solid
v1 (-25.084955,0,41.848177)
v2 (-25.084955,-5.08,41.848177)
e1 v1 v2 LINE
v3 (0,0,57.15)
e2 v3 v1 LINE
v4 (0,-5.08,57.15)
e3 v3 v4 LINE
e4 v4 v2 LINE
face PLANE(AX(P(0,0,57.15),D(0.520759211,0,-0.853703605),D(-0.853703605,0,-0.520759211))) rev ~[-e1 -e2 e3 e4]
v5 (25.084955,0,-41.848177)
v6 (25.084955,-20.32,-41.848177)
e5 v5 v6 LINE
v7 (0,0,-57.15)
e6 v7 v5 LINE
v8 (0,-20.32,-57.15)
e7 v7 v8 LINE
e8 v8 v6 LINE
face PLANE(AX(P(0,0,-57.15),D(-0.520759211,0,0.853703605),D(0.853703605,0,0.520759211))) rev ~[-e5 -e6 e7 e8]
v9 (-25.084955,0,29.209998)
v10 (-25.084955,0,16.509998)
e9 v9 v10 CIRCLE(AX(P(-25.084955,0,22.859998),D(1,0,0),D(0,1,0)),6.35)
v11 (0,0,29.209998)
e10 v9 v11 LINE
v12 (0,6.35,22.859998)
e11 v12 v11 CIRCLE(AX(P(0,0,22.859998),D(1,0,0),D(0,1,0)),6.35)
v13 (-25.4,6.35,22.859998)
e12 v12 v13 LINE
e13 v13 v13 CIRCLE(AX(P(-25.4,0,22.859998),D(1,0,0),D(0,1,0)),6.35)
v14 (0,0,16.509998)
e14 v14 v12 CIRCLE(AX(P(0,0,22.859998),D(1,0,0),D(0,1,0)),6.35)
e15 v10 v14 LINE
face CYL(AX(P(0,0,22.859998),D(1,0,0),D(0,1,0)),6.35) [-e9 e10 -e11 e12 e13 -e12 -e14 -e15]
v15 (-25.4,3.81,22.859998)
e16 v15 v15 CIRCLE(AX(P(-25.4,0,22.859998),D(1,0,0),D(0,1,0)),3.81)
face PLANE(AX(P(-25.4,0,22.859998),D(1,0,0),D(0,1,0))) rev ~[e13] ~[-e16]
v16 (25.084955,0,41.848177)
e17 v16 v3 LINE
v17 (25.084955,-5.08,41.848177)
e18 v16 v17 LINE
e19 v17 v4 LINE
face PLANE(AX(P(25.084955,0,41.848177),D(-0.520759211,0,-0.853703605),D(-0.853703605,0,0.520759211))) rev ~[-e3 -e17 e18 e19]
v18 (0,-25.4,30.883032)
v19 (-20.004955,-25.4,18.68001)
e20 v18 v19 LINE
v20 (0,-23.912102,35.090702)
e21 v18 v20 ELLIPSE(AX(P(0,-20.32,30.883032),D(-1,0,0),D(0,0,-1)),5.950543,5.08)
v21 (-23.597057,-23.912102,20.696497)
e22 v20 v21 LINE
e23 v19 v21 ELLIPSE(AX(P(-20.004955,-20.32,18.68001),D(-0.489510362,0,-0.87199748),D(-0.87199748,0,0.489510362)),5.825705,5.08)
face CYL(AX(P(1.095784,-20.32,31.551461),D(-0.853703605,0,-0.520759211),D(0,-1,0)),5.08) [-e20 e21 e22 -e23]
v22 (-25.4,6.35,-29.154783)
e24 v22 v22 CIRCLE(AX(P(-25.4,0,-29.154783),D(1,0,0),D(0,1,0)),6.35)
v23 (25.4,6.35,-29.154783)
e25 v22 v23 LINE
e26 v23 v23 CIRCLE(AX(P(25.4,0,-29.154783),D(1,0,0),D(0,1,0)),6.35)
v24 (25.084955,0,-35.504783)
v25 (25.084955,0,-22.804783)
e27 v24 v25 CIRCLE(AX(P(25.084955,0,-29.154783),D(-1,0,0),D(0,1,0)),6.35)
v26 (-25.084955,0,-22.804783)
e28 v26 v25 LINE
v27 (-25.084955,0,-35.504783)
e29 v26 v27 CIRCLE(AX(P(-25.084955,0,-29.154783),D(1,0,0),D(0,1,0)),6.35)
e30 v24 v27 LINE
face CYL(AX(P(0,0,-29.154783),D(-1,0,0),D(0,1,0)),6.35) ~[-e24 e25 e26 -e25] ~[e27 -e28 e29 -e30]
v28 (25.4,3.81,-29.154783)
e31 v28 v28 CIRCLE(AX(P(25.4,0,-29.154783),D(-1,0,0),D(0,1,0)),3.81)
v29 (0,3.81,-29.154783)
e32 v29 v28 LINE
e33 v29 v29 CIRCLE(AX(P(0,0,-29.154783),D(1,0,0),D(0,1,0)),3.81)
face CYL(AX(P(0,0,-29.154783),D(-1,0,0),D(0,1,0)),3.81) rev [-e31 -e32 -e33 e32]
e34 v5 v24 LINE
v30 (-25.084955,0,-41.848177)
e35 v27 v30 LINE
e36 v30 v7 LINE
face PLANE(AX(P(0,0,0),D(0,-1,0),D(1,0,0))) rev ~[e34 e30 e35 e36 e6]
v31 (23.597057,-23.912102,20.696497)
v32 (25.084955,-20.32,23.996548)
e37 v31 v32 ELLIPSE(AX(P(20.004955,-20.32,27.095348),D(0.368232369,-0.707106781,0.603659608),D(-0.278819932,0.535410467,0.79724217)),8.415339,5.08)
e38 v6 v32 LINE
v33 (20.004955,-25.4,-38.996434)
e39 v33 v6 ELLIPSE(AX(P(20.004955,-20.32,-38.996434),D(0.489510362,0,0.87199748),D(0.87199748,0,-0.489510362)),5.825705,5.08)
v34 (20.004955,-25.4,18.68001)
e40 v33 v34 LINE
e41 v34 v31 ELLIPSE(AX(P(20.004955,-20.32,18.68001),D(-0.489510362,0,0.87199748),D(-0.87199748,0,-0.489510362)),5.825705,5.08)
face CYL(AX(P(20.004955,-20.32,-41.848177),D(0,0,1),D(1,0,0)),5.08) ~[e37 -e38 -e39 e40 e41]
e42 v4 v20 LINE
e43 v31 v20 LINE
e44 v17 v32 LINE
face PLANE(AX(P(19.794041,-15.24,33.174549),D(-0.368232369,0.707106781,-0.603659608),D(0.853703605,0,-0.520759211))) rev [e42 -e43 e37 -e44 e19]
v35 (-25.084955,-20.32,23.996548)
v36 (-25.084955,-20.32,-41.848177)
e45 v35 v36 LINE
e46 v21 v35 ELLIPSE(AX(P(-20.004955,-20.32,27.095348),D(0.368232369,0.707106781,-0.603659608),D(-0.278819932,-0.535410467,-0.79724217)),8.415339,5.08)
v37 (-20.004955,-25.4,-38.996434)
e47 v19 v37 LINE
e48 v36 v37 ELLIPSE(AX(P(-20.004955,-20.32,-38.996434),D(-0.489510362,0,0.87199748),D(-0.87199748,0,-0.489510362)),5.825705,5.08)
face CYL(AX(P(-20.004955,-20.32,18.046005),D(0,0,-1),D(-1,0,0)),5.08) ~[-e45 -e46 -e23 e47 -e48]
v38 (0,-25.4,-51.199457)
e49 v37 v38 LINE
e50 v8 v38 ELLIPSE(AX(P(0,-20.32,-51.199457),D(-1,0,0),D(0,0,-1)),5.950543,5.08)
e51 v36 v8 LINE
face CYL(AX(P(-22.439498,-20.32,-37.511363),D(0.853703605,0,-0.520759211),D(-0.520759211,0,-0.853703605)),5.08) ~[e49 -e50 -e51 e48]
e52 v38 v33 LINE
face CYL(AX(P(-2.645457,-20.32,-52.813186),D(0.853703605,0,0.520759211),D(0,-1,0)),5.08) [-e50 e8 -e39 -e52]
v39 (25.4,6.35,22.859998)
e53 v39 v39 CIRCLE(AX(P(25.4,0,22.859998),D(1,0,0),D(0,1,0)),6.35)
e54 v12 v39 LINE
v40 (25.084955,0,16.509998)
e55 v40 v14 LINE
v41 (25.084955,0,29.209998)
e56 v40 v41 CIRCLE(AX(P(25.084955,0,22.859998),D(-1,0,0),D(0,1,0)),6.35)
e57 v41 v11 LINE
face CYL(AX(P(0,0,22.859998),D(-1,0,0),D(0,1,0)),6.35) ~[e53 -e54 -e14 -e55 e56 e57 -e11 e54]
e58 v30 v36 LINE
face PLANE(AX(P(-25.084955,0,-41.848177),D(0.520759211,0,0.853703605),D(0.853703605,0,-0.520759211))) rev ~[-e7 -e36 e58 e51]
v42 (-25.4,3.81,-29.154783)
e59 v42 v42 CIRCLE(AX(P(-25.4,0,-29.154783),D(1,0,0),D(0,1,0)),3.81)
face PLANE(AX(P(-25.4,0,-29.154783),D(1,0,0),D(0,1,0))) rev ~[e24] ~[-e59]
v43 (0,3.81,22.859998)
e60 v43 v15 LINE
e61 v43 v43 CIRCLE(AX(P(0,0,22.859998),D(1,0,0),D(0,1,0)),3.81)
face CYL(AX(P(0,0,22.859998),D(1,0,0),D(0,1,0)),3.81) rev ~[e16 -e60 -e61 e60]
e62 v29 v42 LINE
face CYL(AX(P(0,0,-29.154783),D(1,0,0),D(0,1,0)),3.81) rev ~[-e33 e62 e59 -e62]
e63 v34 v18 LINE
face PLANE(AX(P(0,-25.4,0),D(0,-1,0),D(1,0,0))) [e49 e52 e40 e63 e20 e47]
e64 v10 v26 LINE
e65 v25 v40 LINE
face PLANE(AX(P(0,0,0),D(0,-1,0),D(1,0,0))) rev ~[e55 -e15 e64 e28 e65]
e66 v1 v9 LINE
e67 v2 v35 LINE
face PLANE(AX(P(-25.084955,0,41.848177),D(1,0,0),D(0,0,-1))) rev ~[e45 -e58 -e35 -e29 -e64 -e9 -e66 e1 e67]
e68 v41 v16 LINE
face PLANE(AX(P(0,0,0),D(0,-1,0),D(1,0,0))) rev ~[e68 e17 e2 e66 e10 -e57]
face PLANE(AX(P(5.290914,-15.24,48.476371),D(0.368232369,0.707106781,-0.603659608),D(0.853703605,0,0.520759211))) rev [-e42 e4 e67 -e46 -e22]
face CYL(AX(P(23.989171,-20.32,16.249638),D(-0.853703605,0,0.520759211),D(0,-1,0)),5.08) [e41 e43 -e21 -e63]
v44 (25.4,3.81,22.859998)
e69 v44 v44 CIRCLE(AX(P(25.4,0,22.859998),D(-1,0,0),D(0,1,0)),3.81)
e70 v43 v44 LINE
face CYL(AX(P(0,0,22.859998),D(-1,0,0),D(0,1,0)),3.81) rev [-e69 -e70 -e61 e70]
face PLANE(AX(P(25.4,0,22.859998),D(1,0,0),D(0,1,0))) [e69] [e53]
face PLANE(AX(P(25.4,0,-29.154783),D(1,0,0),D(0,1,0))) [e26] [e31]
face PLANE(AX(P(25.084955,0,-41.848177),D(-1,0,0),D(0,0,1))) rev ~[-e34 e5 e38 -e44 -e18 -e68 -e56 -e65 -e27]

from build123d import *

# Parameters (mm, degrees)
F1_DEPTH       = 25.4
F2_SIZE        = 20.32
F5_R           = 6.35
F6_DEPTH       = 25.4
F6_DEPTH_BACK  = 25.4
F7_R           = 3.81
F8_DEPTH       = 46.228
F8_DEPTH_BACK  = 55.88
F9_R           = 6.35
F10_DEPTH      = 25.4
F10_DEPTH_BACK = 25.4
F11_R          = 3.81
F12_DEPTH      = 41.402
F12_DEPTH_BACK = 45.212
F13_R          = 5.08


# Not quite as in the source:
# - a feature of the source that left no trace in its solid (it failed there, or was rolled back) is left out


with BuildPart() as f1:
    # F0 (on Front) → F1 (new body)
    with BuildSketch(Plane.XZ):
        Polygon((0, 57.15), (-25.0849546432, 41.8481773181), (-25.0849546432, -41.8481773181), (0, -57.15), (25.0849546432, -41.8481773181), (25.0849546432, 41.8481773181), align=None)
    extrude(amount=F1_DEPTH)

    # F2
    f2_edges = [f1.edges().sort_by_distance(p)[0] for p in [
        (-12.542477, -25.4, 49.499089),
        (12.542477, -25.4, 49.499089),
    ]]
    chamfer(f2_edges, length=F2_SIZE)

    # F5 (on Right) → F6 (join, two sides)
    with BuildSketch(Plane.YZ) as f6_sk:
        with Locations((0, -29.1547831148)):
            Circle(F5_R)
    extrude(amount=-F6_DEPTH)
    extrude(f6_sk.sketch, amount=F6_DEPTH_BACK)

    # F7 (on Right) → F8 (cut, two sides)
    with BuildSketch(Plane.YZ) as f8_sk:
        with Locations((0, -29.1547831148)):
            Circle(F7_R)
    extrude(amount=-F8_DEPTH, mode=Mode.SUBTRACT)
    extrude(f8_sk.sketch, amount=F8_DEPTH_BACK, mode=Mode.SUBTRACT)

    # F9 (on Right) → F10 (join, two sides)
    with BuildSketch(Plane.YZ) as f10_sk:
        with Locations((0, 22.8599980474)):
            Circle(F9_R)
    extrude(amount=F10_DEPTH)
    extrude(f10_sk.sketch, amount=-F10_DEPTH_BACK)

    # F11 (on Right) → F12 (cut, two sides)
    with BuildSketch(Plane.YZ) as f12_sk:
        with Locations((0, 22.8599980474)):
            Circle(F11_R)
    extrude(amount=-F12_DEPTH, mode=Mode.SUBTRACT)
    extrude(f12_sk.sketch, amount=F12_DEPTH_BACK, mode=Mode.SUBTRACT)

    # F13
    f13_edges = [f1.edges().sort_by_distance(p)[0] for p in [
        (-25.084955, -25.4, -11.901086),
        (-12.542477, -25.4, 25.696917),
        (-12.542477, -25.4, -49.499089),
        (12.542477, -25.4, 25.696917),
        (12.542477, -25.4, -49.499089),
        (25.084955, -25.4, -11.901086),
    ]]
    fillet(f13_edges, radius=F13_R)


solid = f1.part
